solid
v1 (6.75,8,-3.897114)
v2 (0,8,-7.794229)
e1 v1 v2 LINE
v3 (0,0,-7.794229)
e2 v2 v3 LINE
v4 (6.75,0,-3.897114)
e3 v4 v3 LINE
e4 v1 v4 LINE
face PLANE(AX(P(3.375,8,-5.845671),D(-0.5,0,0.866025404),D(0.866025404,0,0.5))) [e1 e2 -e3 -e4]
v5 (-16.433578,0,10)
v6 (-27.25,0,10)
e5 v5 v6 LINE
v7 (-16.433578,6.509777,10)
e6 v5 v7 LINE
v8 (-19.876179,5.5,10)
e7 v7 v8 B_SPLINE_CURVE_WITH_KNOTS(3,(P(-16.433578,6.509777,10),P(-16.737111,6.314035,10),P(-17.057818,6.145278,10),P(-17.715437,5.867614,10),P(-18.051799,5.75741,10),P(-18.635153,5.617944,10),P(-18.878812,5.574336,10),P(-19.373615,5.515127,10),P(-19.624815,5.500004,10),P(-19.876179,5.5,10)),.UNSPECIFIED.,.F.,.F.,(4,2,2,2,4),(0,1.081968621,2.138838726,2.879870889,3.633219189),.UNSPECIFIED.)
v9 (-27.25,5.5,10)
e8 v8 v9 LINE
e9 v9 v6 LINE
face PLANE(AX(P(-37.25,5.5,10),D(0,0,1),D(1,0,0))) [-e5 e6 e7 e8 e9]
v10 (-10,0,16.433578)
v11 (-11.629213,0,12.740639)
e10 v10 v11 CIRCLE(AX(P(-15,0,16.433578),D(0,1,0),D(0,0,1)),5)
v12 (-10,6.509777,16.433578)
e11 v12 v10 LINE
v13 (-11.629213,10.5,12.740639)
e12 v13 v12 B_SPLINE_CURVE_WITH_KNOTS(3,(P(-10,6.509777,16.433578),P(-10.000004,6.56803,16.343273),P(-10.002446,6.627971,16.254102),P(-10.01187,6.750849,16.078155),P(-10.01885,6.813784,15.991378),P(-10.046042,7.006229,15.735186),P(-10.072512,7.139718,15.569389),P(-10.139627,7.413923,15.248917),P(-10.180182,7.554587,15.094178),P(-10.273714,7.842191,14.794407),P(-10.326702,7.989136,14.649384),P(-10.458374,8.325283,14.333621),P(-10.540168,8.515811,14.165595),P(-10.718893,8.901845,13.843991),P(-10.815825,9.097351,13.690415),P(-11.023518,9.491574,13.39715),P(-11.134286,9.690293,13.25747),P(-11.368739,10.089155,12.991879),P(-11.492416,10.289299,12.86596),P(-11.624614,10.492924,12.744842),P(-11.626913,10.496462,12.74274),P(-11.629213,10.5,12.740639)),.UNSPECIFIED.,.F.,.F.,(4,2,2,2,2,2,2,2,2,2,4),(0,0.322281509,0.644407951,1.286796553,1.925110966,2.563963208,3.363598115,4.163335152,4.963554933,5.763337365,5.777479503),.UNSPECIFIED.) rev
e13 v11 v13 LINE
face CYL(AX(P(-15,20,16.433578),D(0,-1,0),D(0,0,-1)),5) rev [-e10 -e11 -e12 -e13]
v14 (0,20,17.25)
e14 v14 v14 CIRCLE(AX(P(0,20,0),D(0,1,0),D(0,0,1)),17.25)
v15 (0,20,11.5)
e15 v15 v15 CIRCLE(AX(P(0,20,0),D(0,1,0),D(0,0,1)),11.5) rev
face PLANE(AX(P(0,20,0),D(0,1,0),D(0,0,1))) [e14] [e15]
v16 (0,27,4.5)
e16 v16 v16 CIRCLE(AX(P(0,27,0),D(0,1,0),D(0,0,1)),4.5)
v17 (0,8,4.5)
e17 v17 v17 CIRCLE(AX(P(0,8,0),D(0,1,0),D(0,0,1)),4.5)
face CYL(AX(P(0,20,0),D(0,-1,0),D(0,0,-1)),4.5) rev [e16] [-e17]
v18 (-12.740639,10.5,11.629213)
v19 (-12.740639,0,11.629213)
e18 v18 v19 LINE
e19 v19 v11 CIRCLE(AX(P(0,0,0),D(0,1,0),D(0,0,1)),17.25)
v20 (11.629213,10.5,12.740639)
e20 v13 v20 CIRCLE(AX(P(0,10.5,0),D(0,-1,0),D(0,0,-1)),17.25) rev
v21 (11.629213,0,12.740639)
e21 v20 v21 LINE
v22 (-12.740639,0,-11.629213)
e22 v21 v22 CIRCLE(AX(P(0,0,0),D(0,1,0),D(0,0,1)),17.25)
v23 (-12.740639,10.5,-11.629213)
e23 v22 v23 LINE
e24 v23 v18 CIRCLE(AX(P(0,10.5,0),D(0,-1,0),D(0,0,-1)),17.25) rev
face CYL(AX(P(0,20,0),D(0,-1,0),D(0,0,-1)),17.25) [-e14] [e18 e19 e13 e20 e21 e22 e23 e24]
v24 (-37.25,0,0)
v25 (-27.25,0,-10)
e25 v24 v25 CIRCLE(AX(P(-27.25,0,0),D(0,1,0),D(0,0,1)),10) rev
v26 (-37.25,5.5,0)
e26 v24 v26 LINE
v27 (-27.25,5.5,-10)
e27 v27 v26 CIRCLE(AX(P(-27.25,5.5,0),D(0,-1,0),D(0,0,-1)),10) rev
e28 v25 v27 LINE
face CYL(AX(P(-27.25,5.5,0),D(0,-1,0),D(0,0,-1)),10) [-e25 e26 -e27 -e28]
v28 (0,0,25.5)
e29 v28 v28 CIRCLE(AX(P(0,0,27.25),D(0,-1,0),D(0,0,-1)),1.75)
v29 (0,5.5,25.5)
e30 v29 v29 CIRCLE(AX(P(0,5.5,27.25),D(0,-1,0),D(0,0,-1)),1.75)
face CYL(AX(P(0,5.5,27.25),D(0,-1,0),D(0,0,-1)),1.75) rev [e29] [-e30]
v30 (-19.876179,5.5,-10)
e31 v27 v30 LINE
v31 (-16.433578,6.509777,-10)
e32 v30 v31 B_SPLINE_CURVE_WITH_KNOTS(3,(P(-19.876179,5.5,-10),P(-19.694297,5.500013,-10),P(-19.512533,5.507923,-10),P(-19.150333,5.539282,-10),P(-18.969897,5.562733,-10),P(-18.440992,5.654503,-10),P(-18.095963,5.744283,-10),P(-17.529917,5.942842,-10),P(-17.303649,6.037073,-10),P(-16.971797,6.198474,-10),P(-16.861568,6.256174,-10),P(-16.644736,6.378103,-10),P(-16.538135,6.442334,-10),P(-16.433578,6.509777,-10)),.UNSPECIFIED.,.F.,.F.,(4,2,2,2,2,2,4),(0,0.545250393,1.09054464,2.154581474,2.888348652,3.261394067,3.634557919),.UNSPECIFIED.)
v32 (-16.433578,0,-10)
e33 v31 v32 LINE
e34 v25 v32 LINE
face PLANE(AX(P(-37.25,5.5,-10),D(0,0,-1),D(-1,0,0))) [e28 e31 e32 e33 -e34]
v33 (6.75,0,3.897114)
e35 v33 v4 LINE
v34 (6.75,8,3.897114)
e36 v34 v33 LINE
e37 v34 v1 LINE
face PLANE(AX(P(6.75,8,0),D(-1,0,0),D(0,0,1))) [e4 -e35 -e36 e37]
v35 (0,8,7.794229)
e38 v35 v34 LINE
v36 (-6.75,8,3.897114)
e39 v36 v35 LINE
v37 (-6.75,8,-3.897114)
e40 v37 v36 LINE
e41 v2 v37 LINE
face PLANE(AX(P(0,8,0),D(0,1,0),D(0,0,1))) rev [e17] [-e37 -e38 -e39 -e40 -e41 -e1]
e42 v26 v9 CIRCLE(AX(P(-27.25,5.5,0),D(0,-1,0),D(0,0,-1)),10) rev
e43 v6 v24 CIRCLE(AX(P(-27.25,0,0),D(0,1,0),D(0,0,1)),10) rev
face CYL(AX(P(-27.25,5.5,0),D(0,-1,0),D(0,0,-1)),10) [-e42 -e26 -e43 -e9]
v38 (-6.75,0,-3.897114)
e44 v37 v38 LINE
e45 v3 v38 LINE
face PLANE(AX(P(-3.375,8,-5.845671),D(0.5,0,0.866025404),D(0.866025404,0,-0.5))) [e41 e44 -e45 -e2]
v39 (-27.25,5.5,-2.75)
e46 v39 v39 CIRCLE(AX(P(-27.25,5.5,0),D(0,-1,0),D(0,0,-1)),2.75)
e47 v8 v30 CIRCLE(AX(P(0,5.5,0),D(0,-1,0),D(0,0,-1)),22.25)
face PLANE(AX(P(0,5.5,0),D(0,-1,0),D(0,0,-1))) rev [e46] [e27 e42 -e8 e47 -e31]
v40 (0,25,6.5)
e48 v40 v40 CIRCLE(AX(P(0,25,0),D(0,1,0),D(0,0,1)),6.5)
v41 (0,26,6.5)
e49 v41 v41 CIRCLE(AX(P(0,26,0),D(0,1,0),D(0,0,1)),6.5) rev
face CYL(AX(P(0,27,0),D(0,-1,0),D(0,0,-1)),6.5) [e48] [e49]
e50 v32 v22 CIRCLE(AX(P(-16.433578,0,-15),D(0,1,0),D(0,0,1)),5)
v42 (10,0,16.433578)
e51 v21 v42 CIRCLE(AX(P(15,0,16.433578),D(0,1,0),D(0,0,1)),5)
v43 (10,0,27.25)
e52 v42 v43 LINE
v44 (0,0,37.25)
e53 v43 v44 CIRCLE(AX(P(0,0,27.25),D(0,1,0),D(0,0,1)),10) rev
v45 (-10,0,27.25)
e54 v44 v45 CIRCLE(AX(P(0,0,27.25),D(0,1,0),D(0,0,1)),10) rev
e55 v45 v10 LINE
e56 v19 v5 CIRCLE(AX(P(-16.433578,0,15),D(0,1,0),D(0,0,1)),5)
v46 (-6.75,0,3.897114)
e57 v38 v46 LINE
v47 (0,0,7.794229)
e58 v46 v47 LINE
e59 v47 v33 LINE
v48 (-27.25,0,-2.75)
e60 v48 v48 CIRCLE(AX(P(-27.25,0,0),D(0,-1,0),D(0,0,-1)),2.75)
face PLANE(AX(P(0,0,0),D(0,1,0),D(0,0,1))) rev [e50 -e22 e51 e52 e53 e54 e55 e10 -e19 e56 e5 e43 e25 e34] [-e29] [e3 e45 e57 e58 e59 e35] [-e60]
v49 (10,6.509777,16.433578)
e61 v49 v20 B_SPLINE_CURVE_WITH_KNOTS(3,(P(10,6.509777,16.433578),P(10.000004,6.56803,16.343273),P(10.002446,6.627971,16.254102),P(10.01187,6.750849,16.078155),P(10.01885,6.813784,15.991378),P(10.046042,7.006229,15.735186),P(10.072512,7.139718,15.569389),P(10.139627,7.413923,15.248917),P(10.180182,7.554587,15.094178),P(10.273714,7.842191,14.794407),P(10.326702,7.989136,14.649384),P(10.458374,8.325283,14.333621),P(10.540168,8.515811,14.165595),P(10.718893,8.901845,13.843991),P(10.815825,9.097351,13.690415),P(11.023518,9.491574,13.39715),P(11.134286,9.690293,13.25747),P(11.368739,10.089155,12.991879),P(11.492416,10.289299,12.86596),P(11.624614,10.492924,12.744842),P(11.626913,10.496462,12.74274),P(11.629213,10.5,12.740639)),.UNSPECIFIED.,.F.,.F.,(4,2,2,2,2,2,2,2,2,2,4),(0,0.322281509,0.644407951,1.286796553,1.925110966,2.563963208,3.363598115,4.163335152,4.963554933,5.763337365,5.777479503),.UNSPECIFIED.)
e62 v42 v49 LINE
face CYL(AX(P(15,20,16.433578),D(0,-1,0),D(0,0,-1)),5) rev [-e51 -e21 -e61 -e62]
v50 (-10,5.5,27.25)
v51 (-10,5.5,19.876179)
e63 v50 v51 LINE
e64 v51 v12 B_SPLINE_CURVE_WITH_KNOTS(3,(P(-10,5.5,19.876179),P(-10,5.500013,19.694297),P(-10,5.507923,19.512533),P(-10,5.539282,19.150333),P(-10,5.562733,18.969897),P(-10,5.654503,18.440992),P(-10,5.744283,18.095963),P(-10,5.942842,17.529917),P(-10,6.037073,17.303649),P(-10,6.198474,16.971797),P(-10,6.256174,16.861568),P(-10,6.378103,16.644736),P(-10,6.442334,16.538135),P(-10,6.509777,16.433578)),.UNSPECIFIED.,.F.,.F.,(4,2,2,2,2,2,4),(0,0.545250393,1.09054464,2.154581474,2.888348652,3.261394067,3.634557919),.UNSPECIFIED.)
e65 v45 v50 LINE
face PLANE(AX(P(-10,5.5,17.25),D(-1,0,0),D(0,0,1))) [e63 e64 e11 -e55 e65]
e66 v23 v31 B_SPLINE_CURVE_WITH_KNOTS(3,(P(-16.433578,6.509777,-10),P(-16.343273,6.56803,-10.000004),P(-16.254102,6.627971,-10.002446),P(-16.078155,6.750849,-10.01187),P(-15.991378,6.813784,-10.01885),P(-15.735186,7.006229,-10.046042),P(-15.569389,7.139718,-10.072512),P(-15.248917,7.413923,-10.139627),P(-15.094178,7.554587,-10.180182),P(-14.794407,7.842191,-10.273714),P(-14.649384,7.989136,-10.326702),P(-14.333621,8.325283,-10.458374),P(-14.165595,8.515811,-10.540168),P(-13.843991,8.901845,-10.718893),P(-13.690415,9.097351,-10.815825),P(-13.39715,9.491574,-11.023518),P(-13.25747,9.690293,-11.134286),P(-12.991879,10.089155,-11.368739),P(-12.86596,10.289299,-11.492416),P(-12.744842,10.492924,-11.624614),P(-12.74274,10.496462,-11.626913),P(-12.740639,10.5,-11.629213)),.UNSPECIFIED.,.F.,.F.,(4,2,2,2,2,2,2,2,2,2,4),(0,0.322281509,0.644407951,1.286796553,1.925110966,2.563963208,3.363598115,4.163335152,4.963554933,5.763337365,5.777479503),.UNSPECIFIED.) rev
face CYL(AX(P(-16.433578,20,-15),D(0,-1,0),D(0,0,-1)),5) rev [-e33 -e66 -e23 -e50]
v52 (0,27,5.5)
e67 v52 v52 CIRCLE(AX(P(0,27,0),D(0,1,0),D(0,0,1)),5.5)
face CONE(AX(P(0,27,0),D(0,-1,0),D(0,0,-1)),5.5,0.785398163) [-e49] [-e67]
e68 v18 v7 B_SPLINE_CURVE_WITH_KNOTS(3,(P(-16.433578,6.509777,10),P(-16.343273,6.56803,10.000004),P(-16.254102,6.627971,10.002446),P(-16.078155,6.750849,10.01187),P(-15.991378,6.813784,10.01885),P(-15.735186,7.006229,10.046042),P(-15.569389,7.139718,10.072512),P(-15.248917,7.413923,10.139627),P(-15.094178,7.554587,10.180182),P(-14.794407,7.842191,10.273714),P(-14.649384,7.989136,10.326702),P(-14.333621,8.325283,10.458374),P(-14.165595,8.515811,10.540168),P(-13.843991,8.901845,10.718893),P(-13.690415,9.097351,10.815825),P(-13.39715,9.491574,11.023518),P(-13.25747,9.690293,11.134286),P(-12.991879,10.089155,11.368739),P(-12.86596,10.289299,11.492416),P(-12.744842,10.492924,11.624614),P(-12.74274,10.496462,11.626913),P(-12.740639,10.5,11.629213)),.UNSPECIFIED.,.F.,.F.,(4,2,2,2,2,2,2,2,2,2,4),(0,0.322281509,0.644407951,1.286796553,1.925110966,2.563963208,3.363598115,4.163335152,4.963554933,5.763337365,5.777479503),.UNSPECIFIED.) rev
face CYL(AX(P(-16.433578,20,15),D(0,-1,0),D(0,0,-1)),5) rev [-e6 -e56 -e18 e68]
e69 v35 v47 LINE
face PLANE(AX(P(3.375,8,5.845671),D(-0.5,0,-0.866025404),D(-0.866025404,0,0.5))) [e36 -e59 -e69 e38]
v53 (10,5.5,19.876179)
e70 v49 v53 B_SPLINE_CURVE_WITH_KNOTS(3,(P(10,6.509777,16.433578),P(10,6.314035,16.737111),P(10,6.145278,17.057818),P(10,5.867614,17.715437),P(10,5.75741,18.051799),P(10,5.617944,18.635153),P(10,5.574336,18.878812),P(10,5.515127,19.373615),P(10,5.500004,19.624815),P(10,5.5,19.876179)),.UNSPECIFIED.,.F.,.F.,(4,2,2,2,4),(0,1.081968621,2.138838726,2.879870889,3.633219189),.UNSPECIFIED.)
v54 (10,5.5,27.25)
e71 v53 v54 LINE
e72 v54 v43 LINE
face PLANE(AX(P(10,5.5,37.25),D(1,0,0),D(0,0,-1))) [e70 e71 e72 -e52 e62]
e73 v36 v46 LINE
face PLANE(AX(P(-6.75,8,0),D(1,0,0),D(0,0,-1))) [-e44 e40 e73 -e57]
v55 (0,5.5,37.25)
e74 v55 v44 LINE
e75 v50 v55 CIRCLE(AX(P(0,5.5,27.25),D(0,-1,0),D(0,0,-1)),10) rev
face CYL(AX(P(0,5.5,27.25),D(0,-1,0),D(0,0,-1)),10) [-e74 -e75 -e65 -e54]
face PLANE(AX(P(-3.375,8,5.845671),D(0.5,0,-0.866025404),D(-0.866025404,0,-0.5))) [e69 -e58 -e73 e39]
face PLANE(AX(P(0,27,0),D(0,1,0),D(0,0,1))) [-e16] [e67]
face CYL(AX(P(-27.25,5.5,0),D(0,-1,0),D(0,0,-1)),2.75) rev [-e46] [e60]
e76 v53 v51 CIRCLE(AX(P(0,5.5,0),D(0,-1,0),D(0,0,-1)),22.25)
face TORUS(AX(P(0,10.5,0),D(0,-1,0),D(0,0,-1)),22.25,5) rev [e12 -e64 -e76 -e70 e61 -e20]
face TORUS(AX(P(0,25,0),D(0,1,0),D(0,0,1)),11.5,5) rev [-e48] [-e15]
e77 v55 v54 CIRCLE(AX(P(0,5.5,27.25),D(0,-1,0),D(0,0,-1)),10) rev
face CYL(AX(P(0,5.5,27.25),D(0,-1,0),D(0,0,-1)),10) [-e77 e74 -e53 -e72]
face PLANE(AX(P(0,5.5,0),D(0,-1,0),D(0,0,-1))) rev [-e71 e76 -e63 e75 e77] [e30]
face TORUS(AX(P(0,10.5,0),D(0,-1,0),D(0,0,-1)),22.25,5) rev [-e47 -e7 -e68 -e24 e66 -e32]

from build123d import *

# Parameters (mm, degrees)
ESBO_O1_R                = 17.25
ESBO_O1_R_2              = 4.5
RESSALTO_EXTRUS_O1_DEPTH = 20
CORTE_EXTRUS_O1_DEPTH    = 8
ESBO_O5_R                = 2.75
ESBO_O5_R_2              = 1.75
RESSALTO_EXTRUS_O2_DEPTH = 5.5
FILETE1_R                = 5
FILETE2_R                = 10
ESBO_O7_R                = 6.5
ESBO_O7_R_2              = 4.5
RESSALTO_EXTRUS_O3_DEPTH = 7
FILETE3_R                = 5
CHANFRO1_SIZE            = 1


with BuildPart() as part:
    # Esboço1 → Ressalto-extrusão1 (new body)
    with BuildSketch(Plane(origin=(0, 0, 0), x_dir=(1, 0, 0), z_dir=(0, 1, 0))):
        with Locations(Location((0, 0, 0), (0, 0, 270))):
            Circle(ESBO_O1_R)
        with Locations(Location((0, 0, 0), (0, 0, 270))):
            Circle(ESBO_O1_R_2, mode=Mode.SUBTRACT)
    extrude(amount=RESSALTO_EXTRUS_O1_DEPTH)

    # Esboço1<3> → Corte-extrusão1 (cut)
    with BuildSketch(Plane(origin=(0, 0, 0), x_dir=(1, 0, 0), z_dir=(0, 1, 0))):
        Polygon((-6.75, 3.897114317), (-6.75, -3.897114317), (0, -7.794228634), (6.75, -3.897114317), (6.75, 3.897114317), (0, 7.794228634), align=None)
    extrude(amount=CORTE_EXTRUS_O1_DEPTH, mode=Mode.SUBTRACT)

    # Esboço5 → Ressalto-extrusão2 (add)
    # profile 1 of 2: a face of its own
    with BuildSketch(Plane.XZ):
        with BuildLine():
            Line((-17.25, 10), (-14.055692797, 10))
            ThreePointArc((-14.055692797, 10), (-17.25, 0), (-14.055692797, -10))
            Line((-14.055692797, -10), (-17.25, -10))
            Line((-17.25, -10), (-37.25, -10))
            Line((-37.25, -10), (-37.25, 10))
            Line((-37.25, 10), (-17.25, 10))
        make_face()
        with Locations(Location((-27.25, 0, 0), (0, 0, 270))):
            Circle(ESBO_O5_R, mode=Mode.SUBTRACT)
    # profile 2 of 2: a face of its own
    with BuildSketch(Plane.XZ):
        with BuildLine():
            Line((-10, 17.25), (-10, 14.055692797))
            ThreePointArc((-10, 14.055692797), (0, 17.25), (10, 14.055692797))
            Line((10, 14.055692797), (10, 17.25))
            Line((10, 17.25), (10, 37.25))
            Line((10, 37.25), (-10, 37.25))
            Line((-10, 37.25), (-10, 17.25))
        make_face()
        with Locations(Location((0, 27.25, 0), (0, 0, 270))):
            Circle(ESBO_O5_R_2, mode=Mode.SUBTRACT)
    extrude(amount=-RESSALTO_EXTRUS_O2_DEPTH)

    # Filete1
    filete1_edges = [part.edges().sort_by_distance(p)[0] for p in [
        (-14.055692797, 2.75, -10),
        (-17.25, 5.5, 0),
        (-14.055692797, 2.75, 10),
        (-5.248895086, 5.5, 16.432029709),
        (10, 2.75, 14.055692797),
        (-10, 2.75, 14.055692797),
    ]]
    fillet(filete1_edges, radius=FILETE1_R)

    # Filete2
    filete2_edges = [part.edges().sort_by_distance(p)[0] for p in [
        (10, 2.75, 37.25),
        (-10, 2.75, 37.25),
        (-37.25, 2.75, -10),
        (-37.25, 2.75, 10),
    ]]
    fillet(filete2_edges, radius=FILETE2_R - 0.0001)  # a hair under: the kernel refuses the full size

    # Esboço7 → Ressalto-extrusão3 (add)
    with BuildSketch(Plane(origin=(0, 20, 0), x_dir=(1, 0, 0), z_dir=(0, 1, 0))):
        with Locations(Location((0, 0, 0), (0, 0, 270))):
            Circle(ESBO_O7_R)
        with Locations(Location((0, 0, 0), (0, 0, 270))):
            Circle(ESBO_O7_R_2, mode=Mode.SUBTRACT)
    extrude(amount=RESSALTO_EXTRUS_O3_DEPTH)

    # Filete3
    filete3_edges = [part.edges().sort_by_distance(p)[0] for p in [
        (0, 20, -6.5),
    ]]
    fillet(filete3_edges, radius=FILETE3_R)

    # Chanfro1
    chanfro1_edges = [part.edges().sort_by_distance(p)[0] for p in [
        (0, 27, -6.5),
    ]]
    chamfer(chanfro1_edges, length=CHANFRO1_SIZE)


solid = part.part
